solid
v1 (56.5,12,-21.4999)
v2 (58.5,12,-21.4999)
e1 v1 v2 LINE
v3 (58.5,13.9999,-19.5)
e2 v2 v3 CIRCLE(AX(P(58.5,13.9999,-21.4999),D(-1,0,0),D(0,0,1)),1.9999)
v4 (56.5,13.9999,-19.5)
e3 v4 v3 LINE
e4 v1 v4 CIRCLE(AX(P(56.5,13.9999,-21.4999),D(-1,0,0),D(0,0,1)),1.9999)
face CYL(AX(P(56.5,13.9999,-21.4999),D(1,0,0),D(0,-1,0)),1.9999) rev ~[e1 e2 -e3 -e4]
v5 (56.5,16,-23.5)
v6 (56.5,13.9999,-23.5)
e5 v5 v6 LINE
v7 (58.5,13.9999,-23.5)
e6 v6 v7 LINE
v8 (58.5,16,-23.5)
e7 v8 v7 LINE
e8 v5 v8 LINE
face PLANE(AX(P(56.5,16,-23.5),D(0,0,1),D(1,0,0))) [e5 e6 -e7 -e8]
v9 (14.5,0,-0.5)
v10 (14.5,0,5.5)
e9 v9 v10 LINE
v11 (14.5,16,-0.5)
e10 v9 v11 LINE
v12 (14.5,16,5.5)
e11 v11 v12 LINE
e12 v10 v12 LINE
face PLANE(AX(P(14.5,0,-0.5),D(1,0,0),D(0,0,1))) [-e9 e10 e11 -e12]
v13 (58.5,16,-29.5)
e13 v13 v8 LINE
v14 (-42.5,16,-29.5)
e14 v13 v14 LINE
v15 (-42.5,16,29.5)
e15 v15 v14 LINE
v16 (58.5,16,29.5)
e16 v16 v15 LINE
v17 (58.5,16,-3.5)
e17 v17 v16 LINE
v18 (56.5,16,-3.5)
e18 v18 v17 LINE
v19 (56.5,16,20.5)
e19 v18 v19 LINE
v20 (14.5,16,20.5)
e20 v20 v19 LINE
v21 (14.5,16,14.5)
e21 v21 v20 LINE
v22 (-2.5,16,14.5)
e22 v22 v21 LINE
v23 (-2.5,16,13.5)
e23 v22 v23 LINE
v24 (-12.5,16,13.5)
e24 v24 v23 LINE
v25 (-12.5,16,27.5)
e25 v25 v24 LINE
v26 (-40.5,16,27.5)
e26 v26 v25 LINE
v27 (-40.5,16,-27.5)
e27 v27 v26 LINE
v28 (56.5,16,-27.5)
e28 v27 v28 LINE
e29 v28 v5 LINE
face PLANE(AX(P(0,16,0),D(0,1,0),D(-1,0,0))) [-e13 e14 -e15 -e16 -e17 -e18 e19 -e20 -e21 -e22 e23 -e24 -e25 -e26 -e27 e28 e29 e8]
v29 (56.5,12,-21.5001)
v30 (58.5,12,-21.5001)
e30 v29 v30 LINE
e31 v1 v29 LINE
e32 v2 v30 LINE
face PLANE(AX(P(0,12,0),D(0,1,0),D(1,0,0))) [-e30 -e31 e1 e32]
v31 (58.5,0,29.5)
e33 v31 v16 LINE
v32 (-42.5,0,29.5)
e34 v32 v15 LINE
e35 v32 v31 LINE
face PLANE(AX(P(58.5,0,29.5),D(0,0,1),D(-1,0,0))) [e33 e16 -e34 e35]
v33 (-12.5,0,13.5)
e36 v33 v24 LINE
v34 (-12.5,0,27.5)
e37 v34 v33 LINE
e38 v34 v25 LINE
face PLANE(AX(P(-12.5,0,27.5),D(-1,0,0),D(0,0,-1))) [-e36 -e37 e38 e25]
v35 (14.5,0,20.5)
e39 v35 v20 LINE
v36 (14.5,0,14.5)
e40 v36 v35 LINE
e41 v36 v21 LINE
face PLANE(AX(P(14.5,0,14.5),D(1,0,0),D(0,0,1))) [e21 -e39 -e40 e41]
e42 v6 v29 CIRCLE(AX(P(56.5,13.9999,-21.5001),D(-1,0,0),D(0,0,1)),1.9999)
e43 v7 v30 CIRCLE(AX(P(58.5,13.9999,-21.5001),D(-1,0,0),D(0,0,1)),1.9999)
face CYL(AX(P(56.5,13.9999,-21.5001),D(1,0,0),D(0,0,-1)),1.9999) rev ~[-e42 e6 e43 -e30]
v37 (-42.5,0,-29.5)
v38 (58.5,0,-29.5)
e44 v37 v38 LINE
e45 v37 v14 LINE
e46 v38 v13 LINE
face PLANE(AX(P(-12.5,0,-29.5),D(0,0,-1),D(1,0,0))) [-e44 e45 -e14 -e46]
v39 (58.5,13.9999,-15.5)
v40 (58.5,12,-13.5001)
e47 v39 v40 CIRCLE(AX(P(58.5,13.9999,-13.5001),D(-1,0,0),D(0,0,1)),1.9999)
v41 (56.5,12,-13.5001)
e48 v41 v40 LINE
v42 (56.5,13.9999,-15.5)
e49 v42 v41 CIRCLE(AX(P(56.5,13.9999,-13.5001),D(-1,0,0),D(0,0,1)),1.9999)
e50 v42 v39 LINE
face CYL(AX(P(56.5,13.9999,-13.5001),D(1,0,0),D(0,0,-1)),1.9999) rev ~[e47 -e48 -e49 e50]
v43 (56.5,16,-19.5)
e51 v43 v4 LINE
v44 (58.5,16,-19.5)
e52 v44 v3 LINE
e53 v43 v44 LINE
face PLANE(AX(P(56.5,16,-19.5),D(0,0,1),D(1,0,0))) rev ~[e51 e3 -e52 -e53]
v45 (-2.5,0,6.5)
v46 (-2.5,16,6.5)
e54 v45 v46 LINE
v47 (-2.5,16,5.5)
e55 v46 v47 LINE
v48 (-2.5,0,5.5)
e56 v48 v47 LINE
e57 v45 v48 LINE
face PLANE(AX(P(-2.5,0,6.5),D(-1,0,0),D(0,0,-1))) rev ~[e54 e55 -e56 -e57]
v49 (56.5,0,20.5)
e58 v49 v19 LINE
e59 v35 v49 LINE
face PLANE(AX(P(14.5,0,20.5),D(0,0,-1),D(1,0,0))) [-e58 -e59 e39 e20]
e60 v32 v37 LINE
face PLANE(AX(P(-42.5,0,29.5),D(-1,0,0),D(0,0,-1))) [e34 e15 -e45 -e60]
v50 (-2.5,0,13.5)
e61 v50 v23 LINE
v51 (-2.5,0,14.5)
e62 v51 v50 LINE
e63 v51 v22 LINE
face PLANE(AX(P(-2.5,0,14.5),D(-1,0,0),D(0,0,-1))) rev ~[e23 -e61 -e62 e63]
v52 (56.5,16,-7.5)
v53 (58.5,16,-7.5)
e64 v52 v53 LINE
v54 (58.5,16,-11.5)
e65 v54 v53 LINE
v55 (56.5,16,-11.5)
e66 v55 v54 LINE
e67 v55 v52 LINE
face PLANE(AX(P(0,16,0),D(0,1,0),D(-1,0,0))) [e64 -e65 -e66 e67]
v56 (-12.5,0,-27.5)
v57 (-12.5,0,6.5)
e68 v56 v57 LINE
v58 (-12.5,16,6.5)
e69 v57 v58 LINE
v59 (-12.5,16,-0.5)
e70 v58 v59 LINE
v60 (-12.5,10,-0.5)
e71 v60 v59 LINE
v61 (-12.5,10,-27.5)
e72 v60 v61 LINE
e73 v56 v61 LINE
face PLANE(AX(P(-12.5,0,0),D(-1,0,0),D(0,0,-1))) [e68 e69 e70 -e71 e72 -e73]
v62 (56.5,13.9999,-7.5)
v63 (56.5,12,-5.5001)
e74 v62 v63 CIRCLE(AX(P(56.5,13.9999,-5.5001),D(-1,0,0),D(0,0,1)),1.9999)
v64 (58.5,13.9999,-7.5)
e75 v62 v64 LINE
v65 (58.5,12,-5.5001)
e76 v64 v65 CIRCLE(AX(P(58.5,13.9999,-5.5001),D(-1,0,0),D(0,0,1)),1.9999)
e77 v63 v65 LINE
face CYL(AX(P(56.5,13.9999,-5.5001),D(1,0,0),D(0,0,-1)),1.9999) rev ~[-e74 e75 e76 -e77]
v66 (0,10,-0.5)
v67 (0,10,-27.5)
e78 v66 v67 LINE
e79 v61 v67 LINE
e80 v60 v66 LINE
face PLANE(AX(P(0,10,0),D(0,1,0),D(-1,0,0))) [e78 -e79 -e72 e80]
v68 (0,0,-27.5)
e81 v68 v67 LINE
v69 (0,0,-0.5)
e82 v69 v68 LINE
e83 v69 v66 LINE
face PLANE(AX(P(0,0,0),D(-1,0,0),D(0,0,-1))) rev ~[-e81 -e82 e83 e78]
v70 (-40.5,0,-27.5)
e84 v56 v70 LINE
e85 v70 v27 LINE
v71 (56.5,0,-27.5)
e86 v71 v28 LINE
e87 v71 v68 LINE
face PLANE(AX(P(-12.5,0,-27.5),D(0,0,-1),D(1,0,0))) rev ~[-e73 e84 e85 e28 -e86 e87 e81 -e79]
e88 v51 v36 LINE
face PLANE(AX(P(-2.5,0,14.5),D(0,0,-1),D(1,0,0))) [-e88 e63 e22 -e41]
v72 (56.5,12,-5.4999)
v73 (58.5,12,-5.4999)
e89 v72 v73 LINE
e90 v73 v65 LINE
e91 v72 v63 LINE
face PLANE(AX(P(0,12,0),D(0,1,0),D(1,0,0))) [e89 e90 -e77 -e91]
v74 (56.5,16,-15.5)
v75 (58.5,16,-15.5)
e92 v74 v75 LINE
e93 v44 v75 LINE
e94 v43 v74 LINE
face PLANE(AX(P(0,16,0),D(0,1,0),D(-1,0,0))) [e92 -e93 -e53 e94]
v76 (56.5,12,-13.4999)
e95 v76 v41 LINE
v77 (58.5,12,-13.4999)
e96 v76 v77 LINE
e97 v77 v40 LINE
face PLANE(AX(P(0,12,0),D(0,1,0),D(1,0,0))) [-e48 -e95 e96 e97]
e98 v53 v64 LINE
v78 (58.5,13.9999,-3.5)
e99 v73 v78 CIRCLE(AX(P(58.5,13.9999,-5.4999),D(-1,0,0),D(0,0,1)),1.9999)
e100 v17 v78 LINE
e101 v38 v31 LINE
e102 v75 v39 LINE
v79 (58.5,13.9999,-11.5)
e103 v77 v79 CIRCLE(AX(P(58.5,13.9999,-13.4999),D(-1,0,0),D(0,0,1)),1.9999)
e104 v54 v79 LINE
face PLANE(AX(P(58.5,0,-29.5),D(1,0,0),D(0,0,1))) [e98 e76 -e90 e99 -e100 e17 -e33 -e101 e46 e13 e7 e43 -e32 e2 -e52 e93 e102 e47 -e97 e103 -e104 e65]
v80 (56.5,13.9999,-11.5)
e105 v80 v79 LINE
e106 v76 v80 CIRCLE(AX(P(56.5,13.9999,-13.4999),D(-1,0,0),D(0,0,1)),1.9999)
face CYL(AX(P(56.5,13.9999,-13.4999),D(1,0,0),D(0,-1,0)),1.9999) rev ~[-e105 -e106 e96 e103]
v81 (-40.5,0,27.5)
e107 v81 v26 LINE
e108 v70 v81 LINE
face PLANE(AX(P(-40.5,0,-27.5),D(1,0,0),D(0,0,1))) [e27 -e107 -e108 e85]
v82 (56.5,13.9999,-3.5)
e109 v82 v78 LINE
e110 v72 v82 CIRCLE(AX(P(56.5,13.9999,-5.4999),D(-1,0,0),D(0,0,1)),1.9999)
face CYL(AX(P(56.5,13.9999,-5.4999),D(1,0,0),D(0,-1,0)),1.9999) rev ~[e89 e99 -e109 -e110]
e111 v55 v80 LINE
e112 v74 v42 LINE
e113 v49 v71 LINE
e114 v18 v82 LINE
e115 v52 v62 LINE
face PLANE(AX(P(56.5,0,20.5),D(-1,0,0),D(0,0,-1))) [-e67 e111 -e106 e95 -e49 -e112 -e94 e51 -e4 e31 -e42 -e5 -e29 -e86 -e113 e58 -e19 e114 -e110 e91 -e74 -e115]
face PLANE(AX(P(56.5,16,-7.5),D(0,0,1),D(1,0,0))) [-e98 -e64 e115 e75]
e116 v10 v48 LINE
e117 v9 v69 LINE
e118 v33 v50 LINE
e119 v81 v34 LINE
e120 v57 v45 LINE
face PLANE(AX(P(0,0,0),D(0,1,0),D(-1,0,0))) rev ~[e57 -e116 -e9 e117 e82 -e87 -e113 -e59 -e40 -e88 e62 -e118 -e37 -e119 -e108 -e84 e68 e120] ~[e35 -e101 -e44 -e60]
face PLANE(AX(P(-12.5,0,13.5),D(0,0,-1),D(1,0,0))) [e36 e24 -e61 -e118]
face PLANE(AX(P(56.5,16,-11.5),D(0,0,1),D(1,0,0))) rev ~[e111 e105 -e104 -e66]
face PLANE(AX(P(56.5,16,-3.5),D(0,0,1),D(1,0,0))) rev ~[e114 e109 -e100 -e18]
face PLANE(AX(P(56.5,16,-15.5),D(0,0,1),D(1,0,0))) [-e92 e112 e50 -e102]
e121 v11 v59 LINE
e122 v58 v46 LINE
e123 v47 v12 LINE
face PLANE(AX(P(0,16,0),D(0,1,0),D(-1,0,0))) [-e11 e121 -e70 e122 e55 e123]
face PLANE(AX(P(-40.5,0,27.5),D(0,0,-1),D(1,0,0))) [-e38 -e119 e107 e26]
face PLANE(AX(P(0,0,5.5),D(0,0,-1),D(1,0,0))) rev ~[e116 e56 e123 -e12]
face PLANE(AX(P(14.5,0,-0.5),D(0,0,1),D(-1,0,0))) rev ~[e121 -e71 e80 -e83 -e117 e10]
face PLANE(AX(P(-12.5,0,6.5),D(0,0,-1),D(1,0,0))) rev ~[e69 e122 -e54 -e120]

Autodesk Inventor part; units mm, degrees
ref_plane "YZ Plane" through (0, 0, 0) normal (1, 0, 0) x (0, 1, 0)
ref_plane "XZ Plane" through (0, 0, 0) normal (0, 1, 0) x (-1, 0, 0)
ref_plane "XY Plane" through (0, 0, 0) normal (0, 0, 1) x (1, 0, 0)
sketch "Sketch1" plane through (0, 0, 0) normal (0, 1, 0) x (-1, 0, 0)
  line L0 (-58.5, 29.5) -> (42.5, 29.5)
  line L1 (42.5, 29.5) -> (42.5, -29.5)
  line L2 (42.5, -29.5) -> (-58.5, -29.5)
  line L3 (-58.5, -29.5) -> (-58.5, 29.5)
  line L4 (0, 10) -> (2.5, 10)
  line L5 (2.5, 10) -> (12.5, 10)
  line L6 (-14.5, 20.5) -> (-56.5, 20.5)
  line L7 (-56.5, 20.5) -> (-56.5, -0.5)
  line L8 (-56.5, -0.5) -> (-14.5, -0.5)
  line L9 (-14.5, -0.5) -> (-14.5, 20.5)
  line L10 (12.5, 13.5) -> (12.5, 6.5)
  line L11 (12.5, 6.5) -> (2.5, 6.5)
  line L12 (12.5, 13.5) -> (2.5, 13.5)
  line L13 (40.5, 27.5) -> (12.5, 27.5)
  line L14 (12.5, 27.5) -> (12.5, -27.5)
  line L15 (12.5, -27.5) -> (40.5, -27.5)
  line L16 (40.5, -27.5) -> (40.5, 27.5)
  line L17 (12.5, 27.5) -> (12.5, 29.5)
  line L18 (12.5, -27.5) -> (12.5, -29.5)
  line L19 (0, 0) -> (0, 10)
  line L20 (2.5, 13.5) -> (2.5, 6.5)
  line L21 (2.5, 14.5) -> (2.5, 5.5)
  line L22 (2.5, 5.5) -> (-14.5, 5.5)
  line L23 (2.5, 14.5) -> (-14.5, 14.5)
  line L24 (12.5, 0) -> (0, 0)
  line L25 (-56.5, -0.5) -> (12.5, -0.5)
  line L26 (12.5, -0.5) -> (12.5, -27.5)
  line L27 (12.5, -27.5) -> (-56.5, -27.5)
  line L28 (-56.5, -27.5) -> (-56.5, -0.5)
  line L29 (2.5, 5.5) -> (2.5, 0)
  point P0 (-8, 29.5)
  point P1 (0, 5.5)
  dimension "d2" = 2.5
  dimension "d3" = 10
  dimension "d4" = 7
  dimension "d5" = 21
  dimension "d6" = 42
  dimension "d9" = 28
  dimension "d10" = 55
  dimension "d13" = 10
  dimension "d14" = 9
  dimension "d15" = 17
  dimension "d16" = 2
  dimension "d17" = 2
  dimension "d20" = 2
  dimension "d28" = 101
  dimension "d29" = 59
  dimension "d34" = 42
  dimension "d35" = 27
  dimension "d37" = 12.5
sketch "Sketch2" plane through (0, 0, 0) normal (0, 1, 0) x (-1, 0, 0)
  line L0 (0, 0) -> (12.5, 0) projected
  line L1 (40.5, -27.5) -> (-56.5, -27.5) projected
  line L2 (12.5, 0) -> (12.5, -27.5)
  line L3 (12.5, 0) -> (0, 0)
  line L4 (0, 0) -> (0, -27.5)
  line L5 (0, -27.5) -> (12.5, -27.5)
  line L6 (12.5, -27.5) -> (12.5, 0)
  dimension "d36" = 56.5
extrude "Extrusion5" add sketch "Sketch2" along normal blind 10
extrude "Extrusion6" add sketch "Sketch1" along normal blind 16 contours L0 L17 L14 L12 L21 L23 L9 L6 L7 L28 L27 L18 L2 L3 | L0 L1 L2 L18 L15 L16 L13 L17 | L25 L9 L22 L19 L24 L14 | L14 L24 L29 L21 L11 | L24 L19 L22 L29
sketch "Sketch3" plane through (0, 16, 0) normal (0, 1, 0) x (1, 0, 0)
  line L0 (56.5, 3.5) -> (56.5, 7.5)
  line L1 (56.5, 7.5) -> (56.5, 11.5)
  line L2 (56.5, 11.5) -> (56.5, 15.5)
  line L3 (56.5, 15.5) -> (56.5, 19.5)
  line L4 (56.5, 19.5) -> (56.5, 23.5)
  line L5 (56.5, 23.5) -> (56.5, 27.5)
  line L6 (58.5, -29.5) -> (58.5, 29.5) projected
  line L7 (56.5, 23.5) -> (58.5, 23.5)
  line L8 (58.5, -29.5) -> (58.5, 29.5) projected
  line L9 (56.5, 19.5) -> (58.5, 19.5)
  line L10 (56.5, 15.5) -> (58.5, 15.5)
  line L11 (56.5, 11.5) -> (58.5, 11.5)
  line L12 (56.5, 7.5) -> (58.5, 7.5)
  line L13 (56.5, 3.5) -> (58.5, 3.5)
  point P0 (0, 0)
  dimension "d30" = 4
extrude "Extrusion7" cut sketch "Sketch3" against normal blind 4 contours L0 L12 L6 L13 | L2 L10 L6 L11 | L4 L7 L6 L9
fillet "Fillet1" radius 2 6 edges at (57.5, 12, -3.5) (57.5, 12, -11.5) (57.5, 12, -19.5) (57.5, 12, -23.5) (57.5, 12, -15.5) (57.5, 12, -7.5)
properties part number "Lag4"
